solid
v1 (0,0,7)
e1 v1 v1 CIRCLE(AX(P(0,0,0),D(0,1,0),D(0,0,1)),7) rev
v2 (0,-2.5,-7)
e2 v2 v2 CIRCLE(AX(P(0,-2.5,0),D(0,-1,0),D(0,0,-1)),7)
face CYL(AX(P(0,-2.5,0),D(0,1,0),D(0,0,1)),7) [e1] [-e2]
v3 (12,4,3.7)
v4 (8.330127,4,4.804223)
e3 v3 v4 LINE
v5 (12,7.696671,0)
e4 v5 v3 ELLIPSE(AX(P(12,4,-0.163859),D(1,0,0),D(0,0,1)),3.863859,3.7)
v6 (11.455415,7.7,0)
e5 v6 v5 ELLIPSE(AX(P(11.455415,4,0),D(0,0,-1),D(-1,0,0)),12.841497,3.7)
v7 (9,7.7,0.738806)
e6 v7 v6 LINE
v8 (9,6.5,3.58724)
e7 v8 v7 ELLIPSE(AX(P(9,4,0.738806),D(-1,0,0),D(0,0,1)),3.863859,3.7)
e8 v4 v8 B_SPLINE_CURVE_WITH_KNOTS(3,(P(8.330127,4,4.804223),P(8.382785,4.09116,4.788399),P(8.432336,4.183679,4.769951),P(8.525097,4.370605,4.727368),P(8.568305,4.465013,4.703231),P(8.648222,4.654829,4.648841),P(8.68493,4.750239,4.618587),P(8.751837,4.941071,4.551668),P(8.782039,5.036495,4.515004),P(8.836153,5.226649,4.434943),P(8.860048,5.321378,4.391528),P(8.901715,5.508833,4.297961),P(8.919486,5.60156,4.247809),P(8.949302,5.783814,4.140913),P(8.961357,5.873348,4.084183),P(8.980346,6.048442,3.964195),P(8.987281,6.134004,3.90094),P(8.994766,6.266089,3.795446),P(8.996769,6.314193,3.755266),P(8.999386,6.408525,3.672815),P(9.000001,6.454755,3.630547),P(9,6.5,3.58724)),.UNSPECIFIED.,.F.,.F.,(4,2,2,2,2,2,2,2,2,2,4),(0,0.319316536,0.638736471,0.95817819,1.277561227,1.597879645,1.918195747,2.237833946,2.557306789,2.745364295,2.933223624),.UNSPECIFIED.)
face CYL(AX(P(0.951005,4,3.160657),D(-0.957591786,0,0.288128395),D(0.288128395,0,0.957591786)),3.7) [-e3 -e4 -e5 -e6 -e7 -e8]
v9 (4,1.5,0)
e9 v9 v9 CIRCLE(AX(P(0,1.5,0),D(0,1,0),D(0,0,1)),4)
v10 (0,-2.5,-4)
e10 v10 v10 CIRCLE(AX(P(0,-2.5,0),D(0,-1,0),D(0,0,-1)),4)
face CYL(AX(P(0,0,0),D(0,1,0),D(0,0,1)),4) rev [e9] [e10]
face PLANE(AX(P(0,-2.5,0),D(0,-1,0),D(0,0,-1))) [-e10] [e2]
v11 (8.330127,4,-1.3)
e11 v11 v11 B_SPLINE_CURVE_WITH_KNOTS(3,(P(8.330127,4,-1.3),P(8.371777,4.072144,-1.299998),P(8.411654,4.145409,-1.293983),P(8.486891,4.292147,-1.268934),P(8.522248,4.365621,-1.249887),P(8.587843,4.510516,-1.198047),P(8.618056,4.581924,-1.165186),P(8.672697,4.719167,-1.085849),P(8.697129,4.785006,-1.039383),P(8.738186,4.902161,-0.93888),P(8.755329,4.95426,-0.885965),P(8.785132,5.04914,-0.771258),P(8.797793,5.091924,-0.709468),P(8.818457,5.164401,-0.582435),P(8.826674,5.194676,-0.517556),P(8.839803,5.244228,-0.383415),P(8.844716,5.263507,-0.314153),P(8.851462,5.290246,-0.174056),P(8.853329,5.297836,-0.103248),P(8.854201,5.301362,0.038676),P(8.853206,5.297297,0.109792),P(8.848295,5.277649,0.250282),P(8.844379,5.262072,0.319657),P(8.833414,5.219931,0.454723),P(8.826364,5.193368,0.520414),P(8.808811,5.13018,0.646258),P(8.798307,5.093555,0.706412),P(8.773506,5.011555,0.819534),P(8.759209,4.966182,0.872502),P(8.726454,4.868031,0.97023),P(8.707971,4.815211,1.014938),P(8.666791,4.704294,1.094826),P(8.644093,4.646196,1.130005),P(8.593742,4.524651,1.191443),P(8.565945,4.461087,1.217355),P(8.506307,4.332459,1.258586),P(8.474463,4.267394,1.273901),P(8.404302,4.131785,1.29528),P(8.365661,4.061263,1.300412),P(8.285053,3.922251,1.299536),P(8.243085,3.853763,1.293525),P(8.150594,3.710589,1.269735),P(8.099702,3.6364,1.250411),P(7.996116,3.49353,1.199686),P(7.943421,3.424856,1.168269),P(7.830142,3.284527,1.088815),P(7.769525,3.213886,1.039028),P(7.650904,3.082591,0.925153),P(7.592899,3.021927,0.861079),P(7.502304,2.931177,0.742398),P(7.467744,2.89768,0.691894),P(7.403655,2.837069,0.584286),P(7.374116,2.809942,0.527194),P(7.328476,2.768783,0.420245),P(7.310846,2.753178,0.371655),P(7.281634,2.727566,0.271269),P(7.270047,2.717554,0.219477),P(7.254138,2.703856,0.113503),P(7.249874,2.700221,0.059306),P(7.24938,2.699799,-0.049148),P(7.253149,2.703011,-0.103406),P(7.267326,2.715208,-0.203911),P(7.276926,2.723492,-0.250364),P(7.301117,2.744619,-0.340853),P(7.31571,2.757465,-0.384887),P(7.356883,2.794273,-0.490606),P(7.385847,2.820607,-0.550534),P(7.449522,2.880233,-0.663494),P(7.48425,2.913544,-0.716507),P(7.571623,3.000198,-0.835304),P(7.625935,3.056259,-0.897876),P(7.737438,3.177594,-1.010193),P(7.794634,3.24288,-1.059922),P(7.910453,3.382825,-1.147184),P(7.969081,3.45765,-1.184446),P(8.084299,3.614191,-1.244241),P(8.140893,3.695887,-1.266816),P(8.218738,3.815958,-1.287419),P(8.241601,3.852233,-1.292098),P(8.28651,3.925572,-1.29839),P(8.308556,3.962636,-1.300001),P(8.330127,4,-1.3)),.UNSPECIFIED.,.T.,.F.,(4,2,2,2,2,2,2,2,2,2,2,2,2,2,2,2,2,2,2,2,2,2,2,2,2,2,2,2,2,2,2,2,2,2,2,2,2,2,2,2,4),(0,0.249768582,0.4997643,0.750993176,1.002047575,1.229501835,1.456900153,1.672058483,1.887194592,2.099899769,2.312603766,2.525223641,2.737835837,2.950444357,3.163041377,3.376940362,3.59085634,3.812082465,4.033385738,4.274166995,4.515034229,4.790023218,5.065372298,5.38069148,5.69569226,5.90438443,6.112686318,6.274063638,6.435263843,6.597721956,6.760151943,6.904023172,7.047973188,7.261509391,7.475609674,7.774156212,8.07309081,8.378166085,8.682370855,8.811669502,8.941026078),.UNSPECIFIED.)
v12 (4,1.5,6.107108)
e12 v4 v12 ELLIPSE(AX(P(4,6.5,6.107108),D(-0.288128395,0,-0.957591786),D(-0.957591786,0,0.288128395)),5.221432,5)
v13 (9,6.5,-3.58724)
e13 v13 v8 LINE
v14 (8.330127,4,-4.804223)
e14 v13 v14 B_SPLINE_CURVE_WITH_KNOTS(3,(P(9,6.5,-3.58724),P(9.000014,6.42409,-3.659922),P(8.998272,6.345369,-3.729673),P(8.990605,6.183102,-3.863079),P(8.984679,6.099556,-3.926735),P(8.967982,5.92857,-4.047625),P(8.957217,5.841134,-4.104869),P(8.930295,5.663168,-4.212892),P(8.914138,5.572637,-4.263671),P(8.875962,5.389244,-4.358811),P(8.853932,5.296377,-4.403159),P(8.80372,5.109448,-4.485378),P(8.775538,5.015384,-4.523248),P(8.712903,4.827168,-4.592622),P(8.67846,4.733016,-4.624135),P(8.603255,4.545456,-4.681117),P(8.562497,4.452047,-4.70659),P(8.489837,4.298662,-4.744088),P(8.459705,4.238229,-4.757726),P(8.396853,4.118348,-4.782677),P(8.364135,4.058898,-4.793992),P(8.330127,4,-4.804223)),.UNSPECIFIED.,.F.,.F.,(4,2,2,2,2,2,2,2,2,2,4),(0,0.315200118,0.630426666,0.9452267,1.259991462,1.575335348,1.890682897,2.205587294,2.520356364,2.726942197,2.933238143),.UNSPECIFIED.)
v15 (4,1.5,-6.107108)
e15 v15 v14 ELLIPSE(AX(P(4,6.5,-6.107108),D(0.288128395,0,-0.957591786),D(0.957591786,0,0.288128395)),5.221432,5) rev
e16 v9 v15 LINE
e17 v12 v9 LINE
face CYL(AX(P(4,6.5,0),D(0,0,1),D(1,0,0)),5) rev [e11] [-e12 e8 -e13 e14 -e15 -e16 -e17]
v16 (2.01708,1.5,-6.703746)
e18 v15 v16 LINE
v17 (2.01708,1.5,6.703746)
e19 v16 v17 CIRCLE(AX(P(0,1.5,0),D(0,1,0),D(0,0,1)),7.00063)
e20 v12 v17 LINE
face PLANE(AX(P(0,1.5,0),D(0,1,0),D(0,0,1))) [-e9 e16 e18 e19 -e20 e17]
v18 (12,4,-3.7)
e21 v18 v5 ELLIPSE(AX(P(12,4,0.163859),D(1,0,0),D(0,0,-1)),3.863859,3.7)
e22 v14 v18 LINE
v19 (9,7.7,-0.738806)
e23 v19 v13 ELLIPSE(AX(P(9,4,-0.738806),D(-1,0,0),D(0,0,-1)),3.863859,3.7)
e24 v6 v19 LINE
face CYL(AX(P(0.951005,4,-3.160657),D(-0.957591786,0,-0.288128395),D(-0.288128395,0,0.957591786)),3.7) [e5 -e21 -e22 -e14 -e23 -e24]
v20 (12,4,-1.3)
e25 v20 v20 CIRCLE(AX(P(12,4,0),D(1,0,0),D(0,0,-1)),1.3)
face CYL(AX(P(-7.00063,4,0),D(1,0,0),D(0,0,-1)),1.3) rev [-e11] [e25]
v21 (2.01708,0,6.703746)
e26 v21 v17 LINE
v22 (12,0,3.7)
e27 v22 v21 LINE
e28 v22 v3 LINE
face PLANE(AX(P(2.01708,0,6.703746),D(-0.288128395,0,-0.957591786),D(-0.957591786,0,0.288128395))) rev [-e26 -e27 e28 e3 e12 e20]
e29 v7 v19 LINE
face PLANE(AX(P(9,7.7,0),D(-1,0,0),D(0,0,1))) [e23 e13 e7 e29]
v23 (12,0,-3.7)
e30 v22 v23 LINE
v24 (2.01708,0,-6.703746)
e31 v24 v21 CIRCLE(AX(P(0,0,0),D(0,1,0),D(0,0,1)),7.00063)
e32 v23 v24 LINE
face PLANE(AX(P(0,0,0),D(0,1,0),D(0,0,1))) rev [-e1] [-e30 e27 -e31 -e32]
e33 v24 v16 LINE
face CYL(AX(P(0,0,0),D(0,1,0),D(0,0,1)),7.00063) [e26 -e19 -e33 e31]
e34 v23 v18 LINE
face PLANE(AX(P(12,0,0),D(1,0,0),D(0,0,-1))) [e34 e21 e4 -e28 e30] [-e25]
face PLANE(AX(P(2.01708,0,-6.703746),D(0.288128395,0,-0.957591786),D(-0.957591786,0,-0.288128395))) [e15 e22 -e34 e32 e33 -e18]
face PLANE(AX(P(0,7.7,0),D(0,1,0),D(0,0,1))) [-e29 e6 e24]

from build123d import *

# Parameters (mm, degrees)
SKETCH_1_R          = 7
EXTRUDE_1_DEPTH     = 1.5
SKETCH_3_R          = 4
CUT_EXTRUDE_2_DEPTH = 11.012492197
EXTRUDE_START       = -1.5
SKETCH_5_R          = 7
EXTRUDE_2_DEPTH     = 1.5
SKETCH_11_R         = 7
SKETCH_11_R_2       = 4
EXTRUDE_4_DEPTH     = 2.5
EXTRUDE_6_DEPTH     = 6.2
FILLET_1_R          = 5
SKETCH_12_R         = 1.3
CUT_EXTRUDE_3_DEPTH = 22.663858813
FILLET_2_R          = 3.7


with BuildPart() as part:
    # Эскиз1 → Бобышка-Вытянуть1 (new body)
    with BuildSketch(Plane(origin=(0, 0, 0), x_dir=(1, 0, 0), z_dir=(0, 1, 0))):
        with Locations(Location((0, 0, 0), (0, 0, 270))):
            Circle(SKETCH_1_R)
    extrude(amount=EXTRUDE_1_DEPTH)

    # Эскиз3 → Вырез-Вытянуть2 (cut, through all)
    with BuildSketch(Plane(origin=(0, 1.5, 0), x_dir=(1, 0, 0), z_dir=(0, 1, 0))):
        with Locations(Location((0, 0, 0), (0, 0, 270))):
            Circle(SKETCH_3_R)
    extrude(amount=-CUT_EXTRUDE_2_DEPTH, mode=Mode.SUBTRACT)

    # Эскиз5 → Бобышка-Вытянуть2 (add)
    with BuildSketch(Plane(origin=(0, 1.5, 0), x_dir=(1, 0, 0), z_dir=(0, 1, 0)).offset(EXTRUDE_START)):
        with BuildLine():
            ThreePointArc((2.017080382, 6.703746112), (-7.000630343, 0), (2.017080382, -6.703746112))
            Line((2.017080382, -6.703746112), (12, -3.7))
            Line((12, -3.7), (12, 3.7))
            Line((12, 3.7), (2.017080382, 6.703746112))
        make_face()
        Circle(SKETCH_5_R, mode=Mode.SUBTRACT)
    extrude(amount=EXTRUDE_2_DEPTH)

    # Эскиз11 → Бобышка-Вытянуть4 (add)
    with BuildSketch(Plane(origin=(0, 0, 0), x_dir=(-1, 0, 0), z_dir=(0, -1, 0))):
        with Locations(Location((0, 0, 0), (0, 0, 270))):
            Circle(SKETCH_11_R)
        with Locations(Location((0, 0, 0), (0, 0, 270))):
            Circle(SKETCH_11_R_2, mode=Mode.SUBTRACT)
    extrude(amount=EXTRUDE_4_DEPTH)

    # Эскиз13 → Бобышка-Вытянуть6 (add)
    with BuildSketch(Plane(origin=(0, 1.5, 0), x_dir=(1, 0, 0), z_dir=(0, 1, 0))):
        Polygon((9, 4.602665621), (9, 0), (9, -4.602665621), (12, -3.7), (12, 3.7), align=None)
    extrude(amount=EXTRUDE_6_DEPTH)

    # Скругление1
    fillet_1_edges = [part.edges().sort_by_distance(p)[0] for p in [
        (9, 1.5, 0),
    ]]
    fillet(fillet_1_edges, radius=FILLET_1_R)

    # Эскиз12 → Вырез-Вытянуть3 (cut, through all)
    with BuildSketch(Plane(origin=(12, 0, 0), x_dir=(0, 0, -1), z_dir=(1, 0, 0))):
        with Locations((0, 4)):
            Circle(SKETCH_12_R)
    extrude(amount=-CUT_EXTRUDE_3_DEPTH, mode=Mode.SUBTRACT)

    # Скругление2
    # the kernel refuses this fillet: 3.7 mm, written as the material it takes off along each edge
    with BuildSketch(Plane(origin=(0.142275982, 7.7, 7.267853272), x_dir=(0, -1, 0), z_dir=(0.9575917857777037, 0, -0.28812839466298473)), Plane(origin=(20.857724018, 7.7, -1.034812349), x_dir=(0, -1, 0), z_dir=(-0.9575917857777037, 0, -0.28812839466298473))) as fillet_2_piece_1:
        with BuildLine():
            CenterArc((FILLET_2_R, FILLET_2_R), FILLET_2_R, 180, 90)
            Line((0, FILLET_2_R), (0, 0))
            Line((0, 0), (FILLET_2_R, 0))
        make_face()
    extrude(amount=21.632858954, mode=Mode.SUBTRACT)


solid = part.part
